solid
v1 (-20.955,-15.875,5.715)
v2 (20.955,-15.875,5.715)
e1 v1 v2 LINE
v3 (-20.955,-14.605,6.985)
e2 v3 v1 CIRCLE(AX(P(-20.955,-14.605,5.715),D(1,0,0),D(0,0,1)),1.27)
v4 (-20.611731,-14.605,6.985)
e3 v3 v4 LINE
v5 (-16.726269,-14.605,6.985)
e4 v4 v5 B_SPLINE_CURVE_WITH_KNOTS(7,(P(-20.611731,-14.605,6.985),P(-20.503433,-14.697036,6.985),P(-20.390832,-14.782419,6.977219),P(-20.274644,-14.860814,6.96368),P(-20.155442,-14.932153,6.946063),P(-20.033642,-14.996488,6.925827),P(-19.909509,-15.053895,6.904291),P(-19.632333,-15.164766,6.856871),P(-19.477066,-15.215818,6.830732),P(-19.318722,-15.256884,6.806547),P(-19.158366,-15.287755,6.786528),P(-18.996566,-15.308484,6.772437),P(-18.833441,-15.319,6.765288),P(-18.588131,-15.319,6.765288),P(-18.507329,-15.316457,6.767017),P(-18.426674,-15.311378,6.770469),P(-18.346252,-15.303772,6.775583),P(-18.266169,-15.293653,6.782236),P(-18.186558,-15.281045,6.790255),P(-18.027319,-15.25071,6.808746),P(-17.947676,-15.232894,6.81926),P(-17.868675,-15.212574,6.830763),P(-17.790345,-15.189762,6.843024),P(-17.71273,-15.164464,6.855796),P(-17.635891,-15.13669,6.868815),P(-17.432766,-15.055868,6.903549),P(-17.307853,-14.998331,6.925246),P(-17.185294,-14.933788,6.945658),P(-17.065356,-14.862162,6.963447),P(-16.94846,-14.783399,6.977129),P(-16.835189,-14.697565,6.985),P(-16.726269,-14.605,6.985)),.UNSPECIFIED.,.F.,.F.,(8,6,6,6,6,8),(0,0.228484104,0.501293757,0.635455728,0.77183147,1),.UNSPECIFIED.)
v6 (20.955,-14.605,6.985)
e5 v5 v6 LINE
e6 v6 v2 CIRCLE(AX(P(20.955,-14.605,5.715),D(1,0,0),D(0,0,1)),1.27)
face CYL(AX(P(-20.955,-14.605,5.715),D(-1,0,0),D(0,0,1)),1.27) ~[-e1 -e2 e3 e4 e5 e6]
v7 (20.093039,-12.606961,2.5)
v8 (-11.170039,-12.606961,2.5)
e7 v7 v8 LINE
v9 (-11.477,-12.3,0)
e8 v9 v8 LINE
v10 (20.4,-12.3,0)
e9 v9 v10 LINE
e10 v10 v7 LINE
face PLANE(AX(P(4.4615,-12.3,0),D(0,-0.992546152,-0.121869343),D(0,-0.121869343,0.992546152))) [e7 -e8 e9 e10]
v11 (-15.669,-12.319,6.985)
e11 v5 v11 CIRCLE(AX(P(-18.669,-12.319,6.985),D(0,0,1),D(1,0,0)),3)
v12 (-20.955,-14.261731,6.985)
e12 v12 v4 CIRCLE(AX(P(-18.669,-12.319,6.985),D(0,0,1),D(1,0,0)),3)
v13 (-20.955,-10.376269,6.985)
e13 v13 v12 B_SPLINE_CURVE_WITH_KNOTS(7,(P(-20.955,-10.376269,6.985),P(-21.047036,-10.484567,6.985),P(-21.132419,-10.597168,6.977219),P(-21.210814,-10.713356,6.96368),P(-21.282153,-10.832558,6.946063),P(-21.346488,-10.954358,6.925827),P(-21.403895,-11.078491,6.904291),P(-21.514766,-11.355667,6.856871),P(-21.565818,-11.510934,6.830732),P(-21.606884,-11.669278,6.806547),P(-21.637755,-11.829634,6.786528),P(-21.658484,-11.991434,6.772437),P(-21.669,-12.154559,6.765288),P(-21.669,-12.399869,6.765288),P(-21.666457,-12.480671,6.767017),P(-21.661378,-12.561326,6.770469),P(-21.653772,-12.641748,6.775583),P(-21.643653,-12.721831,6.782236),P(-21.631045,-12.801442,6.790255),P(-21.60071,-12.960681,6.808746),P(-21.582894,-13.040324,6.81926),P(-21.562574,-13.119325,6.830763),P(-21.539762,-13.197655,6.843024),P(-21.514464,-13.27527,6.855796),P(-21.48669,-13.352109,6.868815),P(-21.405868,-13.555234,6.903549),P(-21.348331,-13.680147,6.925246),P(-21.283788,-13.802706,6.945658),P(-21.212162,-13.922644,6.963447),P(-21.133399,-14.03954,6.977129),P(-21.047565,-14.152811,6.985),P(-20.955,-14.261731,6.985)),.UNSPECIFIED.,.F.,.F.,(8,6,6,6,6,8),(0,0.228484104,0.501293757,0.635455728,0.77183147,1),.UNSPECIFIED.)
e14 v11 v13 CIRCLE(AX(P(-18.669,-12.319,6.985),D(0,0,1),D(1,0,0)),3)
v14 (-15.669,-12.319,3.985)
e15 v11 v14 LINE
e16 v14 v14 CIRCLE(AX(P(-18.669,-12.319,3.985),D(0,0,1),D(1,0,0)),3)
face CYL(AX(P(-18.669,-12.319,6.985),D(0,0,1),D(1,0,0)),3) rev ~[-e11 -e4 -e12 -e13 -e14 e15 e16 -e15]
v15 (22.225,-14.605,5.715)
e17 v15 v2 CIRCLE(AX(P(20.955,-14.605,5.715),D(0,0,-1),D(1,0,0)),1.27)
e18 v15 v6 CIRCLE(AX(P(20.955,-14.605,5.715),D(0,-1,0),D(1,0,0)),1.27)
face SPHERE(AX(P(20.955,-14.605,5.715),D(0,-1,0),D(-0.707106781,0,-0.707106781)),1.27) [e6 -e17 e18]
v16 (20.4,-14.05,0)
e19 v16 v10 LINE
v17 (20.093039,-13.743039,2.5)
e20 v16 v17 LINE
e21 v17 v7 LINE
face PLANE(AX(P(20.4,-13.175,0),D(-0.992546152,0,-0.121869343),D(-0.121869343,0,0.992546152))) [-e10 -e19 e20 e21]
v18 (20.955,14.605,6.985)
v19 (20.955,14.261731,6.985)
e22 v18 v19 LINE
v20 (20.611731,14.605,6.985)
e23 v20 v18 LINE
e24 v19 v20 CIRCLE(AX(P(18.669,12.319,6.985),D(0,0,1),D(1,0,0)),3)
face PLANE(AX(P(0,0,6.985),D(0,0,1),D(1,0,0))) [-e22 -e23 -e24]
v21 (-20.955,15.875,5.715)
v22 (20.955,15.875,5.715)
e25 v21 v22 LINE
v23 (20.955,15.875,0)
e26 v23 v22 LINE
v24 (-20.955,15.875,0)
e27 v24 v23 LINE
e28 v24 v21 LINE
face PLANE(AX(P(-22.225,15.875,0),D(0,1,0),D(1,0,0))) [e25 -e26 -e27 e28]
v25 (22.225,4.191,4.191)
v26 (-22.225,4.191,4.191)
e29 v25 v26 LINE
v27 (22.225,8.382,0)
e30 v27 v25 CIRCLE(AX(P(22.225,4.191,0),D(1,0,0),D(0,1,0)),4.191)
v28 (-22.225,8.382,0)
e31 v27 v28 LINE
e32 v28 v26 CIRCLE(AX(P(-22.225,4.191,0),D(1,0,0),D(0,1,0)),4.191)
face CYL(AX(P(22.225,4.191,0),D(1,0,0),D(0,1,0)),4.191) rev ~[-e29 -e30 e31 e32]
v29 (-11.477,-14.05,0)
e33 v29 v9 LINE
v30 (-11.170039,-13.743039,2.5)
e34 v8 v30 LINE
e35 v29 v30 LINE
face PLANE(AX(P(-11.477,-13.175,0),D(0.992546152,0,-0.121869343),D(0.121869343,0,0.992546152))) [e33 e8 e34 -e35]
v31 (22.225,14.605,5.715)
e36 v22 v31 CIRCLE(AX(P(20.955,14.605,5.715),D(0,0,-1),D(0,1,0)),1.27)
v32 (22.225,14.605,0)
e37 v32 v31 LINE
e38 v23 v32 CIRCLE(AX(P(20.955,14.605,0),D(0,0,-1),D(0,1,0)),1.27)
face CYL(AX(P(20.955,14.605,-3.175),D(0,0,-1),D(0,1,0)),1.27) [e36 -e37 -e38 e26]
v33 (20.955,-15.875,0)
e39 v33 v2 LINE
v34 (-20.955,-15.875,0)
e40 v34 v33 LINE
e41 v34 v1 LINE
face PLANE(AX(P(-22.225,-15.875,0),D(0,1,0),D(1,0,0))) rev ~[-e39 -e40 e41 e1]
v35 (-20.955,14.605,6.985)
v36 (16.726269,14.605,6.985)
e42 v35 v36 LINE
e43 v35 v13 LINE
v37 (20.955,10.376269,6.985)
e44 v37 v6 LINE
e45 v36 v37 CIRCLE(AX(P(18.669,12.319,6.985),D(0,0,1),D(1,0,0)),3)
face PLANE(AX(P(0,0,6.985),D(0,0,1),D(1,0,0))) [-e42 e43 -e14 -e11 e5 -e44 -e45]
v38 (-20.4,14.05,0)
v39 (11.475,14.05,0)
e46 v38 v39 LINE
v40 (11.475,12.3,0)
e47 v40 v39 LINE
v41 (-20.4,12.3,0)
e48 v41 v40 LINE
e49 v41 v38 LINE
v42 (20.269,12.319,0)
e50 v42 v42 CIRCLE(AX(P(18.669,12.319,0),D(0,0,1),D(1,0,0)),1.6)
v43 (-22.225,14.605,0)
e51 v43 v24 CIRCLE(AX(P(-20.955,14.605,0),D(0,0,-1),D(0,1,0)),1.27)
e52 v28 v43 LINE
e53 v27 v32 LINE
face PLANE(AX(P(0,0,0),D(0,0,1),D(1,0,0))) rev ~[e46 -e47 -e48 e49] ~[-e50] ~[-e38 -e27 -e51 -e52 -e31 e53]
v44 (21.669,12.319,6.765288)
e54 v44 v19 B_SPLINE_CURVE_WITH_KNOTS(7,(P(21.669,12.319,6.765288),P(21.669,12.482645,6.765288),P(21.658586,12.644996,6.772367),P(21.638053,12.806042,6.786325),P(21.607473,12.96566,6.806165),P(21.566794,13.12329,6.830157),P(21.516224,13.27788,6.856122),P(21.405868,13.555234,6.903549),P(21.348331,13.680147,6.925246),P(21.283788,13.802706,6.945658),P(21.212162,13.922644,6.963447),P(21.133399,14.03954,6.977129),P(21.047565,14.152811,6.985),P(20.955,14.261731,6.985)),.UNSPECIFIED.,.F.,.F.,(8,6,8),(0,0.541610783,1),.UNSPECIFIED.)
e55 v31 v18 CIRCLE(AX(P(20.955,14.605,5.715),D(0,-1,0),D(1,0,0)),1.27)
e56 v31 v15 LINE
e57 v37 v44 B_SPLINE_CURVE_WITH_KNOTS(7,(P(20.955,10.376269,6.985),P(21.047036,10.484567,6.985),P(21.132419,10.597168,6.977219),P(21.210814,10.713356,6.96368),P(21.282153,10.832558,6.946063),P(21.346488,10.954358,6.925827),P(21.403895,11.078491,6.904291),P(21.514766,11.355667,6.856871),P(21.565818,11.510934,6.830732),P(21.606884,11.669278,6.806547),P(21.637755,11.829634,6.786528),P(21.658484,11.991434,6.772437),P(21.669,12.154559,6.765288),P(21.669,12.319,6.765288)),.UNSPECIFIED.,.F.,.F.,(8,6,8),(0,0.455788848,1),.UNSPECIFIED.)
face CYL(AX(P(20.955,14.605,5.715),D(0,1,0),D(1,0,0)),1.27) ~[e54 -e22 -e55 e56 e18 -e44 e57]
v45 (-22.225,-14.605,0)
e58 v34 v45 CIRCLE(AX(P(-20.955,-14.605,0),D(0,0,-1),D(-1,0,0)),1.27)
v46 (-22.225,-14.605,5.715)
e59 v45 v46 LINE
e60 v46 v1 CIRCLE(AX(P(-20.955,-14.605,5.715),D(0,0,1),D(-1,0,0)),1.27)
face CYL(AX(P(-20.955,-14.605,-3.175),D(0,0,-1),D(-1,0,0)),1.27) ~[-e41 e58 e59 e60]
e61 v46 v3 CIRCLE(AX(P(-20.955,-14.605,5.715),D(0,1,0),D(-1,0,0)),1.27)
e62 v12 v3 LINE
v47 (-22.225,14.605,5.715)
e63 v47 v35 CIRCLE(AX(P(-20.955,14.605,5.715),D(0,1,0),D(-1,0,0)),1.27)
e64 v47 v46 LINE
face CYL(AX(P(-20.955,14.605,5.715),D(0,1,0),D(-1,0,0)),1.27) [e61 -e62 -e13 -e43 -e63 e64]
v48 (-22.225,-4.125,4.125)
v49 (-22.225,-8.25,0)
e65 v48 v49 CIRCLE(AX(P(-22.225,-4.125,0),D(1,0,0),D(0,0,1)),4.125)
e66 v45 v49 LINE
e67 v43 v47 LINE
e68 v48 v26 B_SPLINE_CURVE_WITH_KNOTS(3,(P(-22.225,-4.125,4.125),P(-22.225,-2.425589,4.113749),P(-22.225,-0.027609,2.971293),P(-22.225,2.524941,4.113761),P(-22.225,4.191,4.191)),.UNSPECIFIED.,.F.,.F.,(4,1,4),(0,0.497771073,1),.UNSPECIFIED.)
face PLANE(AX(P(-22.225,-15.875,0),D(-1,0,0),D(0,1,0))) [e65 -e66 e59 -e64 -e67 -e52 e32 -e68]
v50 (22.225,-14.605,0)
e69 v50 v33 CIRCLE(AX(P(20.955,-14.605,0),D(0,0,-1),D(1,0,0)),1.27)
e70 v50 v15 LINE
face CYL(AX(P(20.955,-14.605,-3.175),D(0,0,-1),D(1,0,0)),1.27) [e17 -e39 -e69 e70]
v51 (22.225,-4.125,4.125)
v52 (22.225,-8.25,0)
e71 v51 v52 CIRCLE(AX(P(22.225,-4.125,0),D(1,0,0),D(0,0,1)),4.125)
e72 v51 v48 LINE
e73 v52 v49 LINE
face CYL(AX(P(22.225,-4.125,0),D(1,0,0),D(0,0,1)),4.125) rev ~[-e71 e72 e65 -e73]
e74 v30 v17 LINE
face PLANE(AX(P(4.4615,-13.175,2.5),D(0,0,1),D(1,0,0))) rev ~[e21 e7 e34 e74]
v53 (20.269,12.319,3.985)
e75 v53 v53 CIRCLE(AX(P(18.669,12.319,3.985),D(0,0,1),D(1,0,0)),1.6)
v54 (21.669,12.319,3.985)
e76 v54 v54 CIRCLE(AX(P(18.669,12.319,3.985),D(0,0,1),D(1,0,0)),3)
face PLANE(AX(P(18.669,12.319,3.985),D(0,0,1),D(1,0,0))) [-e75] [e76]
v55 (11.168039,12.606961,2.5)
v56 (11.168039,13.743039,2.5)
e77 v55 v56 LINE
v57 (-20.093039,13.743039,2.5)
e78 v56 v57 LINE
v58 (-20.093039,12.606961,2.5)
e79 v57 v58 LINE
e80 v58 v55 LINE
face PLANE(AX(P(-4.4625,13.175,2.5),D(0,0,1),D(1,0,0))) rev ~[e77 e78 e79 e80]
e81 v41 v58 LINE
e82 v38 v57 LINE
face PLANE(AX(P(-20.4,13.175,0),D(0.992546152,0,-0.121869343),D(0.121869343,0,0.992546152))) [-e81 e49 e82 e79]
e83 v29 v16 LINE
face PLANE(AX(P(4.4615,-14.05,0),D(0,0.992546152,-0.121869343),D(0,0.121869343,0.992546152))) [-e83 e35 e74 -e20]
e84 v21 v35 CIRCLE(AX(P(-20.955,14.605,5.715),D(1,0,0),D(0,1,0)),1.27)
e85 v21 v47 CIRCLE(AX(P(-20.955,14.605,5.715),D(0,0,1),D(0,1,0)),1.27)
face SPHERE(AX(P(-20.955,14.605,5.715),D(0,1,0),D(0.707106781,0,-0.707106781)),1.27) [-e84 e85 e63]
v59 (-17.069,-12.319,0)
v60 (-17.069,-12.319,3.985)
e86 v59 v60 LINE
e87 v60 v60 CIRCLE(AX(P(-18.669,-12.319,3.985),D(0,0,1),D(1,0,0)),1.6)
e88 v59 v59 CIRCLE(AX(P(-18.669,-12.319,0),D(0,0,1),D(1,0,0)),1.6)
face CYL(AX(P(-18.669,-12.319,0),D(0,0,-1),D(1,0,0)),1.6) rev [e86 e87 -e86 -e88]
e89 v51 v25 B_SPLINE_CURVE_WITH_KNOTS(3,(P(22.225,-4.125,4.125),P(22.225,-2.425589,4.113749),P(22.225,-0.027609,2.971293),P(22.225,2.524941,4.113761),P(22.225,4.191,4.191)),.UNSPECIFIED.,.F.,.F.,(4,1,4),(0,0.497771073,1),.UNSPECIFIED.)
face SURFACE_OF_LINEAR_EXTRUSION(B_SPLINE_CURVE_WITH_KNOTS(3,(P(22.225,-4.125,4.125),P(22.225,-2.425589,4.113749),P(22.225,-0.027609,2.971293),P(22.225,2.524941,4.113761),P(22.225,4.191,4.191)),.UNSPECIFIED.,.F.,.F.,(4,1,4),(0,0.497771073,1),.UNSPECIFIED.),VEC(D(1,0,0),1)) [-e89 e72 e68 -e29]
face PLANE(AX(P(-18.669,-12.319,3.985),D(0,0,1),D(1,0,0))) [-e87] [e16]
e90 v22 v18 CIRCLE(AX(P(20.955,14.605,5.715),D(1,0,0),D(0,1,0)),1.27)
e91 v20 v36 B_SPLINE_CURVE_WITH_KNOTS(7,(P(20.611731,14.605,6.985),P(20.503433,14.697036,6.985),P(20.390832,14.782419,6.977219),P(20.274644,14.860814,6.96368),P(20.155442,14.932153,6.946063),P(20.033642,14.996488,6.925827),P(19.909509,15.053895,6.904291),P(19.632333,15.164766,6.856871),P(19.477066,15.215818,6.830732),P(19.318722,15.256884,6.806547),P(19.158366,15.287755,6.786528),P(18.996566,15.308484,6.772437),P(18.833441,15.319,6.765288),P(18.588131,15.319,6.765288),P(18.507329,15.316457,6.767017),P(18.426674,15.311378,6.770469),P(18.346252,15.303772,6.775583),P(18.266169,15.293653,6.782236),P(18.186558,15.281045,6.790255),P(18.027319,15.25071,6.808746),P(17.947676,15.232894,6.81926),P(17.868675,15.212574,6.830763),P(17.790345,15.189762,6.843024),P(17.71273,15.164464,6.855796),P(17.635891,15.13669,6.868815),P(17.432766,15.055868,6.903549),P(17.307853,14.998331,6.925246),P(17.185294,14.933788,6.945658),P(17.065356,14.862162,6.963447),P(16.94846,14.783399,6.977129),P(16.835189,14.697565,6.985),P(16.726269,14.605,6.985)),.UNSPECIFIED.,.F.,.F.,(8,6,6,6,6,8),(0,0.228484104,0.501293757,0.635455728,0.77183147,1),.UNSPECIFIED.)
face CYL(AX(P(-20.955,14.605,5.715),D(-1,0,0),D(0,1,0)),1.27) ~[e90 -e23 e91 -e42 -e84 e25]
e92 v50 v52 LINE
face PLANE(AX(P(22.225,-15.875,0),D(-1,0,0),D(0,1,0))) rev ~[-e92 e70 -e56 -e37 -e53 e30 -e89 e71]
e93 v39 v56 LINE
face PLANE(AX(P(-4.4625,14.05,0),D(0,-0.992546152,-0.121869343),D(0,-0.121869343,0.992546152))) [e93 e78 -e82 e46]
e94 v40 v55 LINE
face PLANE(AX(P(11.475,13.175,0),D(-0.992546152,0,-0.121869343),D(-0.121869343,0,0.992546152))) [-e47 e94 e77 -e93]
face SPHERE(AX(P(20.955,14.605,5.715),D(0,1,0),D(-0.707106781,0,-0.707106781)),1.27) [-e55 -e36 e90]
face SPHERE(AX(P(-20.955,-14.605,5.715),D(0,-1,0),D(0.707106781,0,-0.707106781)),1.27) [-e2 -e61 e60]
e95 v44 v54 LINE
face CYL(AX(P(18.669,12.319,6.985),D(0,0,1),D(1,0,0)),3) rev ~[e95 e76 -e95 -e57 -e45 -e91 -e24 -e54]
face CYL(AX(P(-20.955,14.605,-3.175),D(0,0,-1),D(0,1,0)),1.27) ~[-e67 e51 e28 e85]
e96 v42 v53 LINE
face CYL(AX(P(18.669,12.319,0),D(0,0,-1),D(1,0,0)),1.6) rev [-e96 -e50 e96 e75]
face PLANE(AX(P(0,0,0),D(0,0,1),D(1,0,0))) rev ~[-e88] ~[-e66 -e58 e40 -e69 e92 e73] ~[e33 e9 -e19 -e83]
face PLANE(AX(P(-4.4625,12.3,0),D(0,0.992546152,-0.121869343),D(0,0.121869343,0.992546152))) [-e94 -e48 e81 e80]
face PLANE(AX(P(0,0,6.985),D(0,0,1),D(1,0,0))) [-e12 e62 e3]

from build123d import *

# Parameters (mm, degrees)
F1_W          = 44.45
F1_H          = 31.75
F2_DEPTH      = 6.985
F4_DEPTH      = 44.45
F6_W          = 31.875
F6_H          = 1.75
F6_W_2        = 31.877
F7_DEPTH      = 2.5
F7_TAPER      = 7
F5_R          = 1.6
F8_DEPTH      = 25.4
F9_R          = 3
F9_R_2        = 1.6
F10_DEPTH     = 3
F11_T1_DEPTH  = 29.21
F11_T3_DEPTH  = 8.89
F11_T5_DEPTH  = 41.91
F11_S9_W      = 1.27
F11_S9_H      = 1.27
F11_T10_DEPTH = 1.27
F11_S15_W     = 1.27
F11_S15_H     = 1.27
F11_T16_DEPTH = 1.27
F11_S21_W     = 1.27
F11_S21_H     = 1.27
F11_T22_DEPTH = 1.27
F11_S27_W     = 1.27
F11_S27_H     = 1.27
F11_T28_DEPTH = 1.27


# Not quite as in the source:
# - a fillet or chamfer that OpenCascade refuses, or shapes differently, is made with other operations: its cross-section is extruded or revolved along the edge and cut away or added


with BuildPart() as f2:
    # F1 (on Top) → F2 (new body)
    with BuildSketch(Plane.XY):
        Rectangle(F1_W, F1_H)
    extrude(amount=F2_DEPTH)

    # F3 (on face) → F4 (cut, through all)
    with BuildSketch(Plane.YZ.offset(22.225)):
        with BuildLine():
            add(Edge.make_bspline(
                [(-4.125, 4.125), (-2.4255892558, 4.1137489608), (-0.0276085061, 2.971292738), (2.5249406681, 4.1137612248), (4.191, 4.191)],
                knots=[0, 0, 0, 0, 0.4977710734, 1, 1, 1, 1], degree=3))
            ThreePointArc((-4.125, 4.125), (-7.0418154724, 2.9168154724), (-8.25, 0))
            ThreePointArc((-8.25, 0), (-7.0418154724, -2.9168154724), (-4.125, -4.125))
            add(Edge.make_bspline(
                [(-4.125, -4.125), (-2.9335741419, -4.2006121948), (0.4172014685, -3.0581585459), (2.1438994445, -4.2006121948), (4.191, -4.191)],
                knots=[0, 0, 0, 0, 0.497799261, 1, 1, 1, 1], degree=3))
            ThreePointArc((4.191, -4.191), (7.15448452, -2.96348452), (8.382, 0))
            ThreePointArc((8.382, 0), (7.15448452, 2.96348452), (4.191, 4.191))
        make_face()
    extrude(amount=-F4_DEPTH, mode=Mode.SUBTRACT)

    # F6 (on Top) → F7 (cut)
    with BuildSketch(Plane.XY):
        with Locations((-4.4625, 13.175)):
            Rectangle(F6_W, F6_H)
        with Locations((4.4615, -13.175)):
            Rectangle(F6_W_2, F6_H)
    extrude(amount=F7_DEPTH, taper=F7_TAPER, mode=Mode.SUBTRACT)

    # F5 (on Top) → F8 (cut)
    with BuildSketch(Plane.XY):
        with Locations((-18.669, -12.319)):
            Circle(F5_R)
        with Locations((18.669, 12.319)):
            Circle(F5_R)
    extrude(amount=F8_DEPTH, mode=Mode.SUBTRACT)

    # F9 (on face) → F10 (cut)
    with BuildSketch(Plane.XY.offset(6.985)):
        with Locations((-18.669, -12.319)):
            Circle(F9_R)
        with Locations((-18.669, -12.319)):
            Circle(F9_R_2, mode=Mode.SUBTRACT)
        with Locations((18.669, 12.319)):
            Circle(F9_R)
        with Locations((18.669, 12.319)):
            Circle(F9_R_2, mode=Mode.SUBTRACT)
    extrude(amount=-F10_DEPTH, mode=Mode.SUBTRACT)

    # F11: fillet of radius 1.27 on 8 edges, made by hand

    # F11_s2 → F11_t1 (cut)
    with BuildSketch(Plane.XZ.offset(-14.605)):
        with BuildLine():
            ThreePointArc((-22.225, 5.715), (-21.8530256121, 6.6130256121), (-20.955, 6.985))
            Line((-20.955, 6.985), (-22.225, 6.985))
            Line((-22.225, 6.985), (-22.225, 5.715))
        make_face()
        with BuildLine():
            ThreePointArc((22.225, 5.715), (21.8530256121, 6.6130256121), (20.955, 6.985))
            Line((20.955, 6.985), (22.225, 6.985))
            Line((22.225, 6.985), (22.225, 5.715))
        make_face()
    extrude(amount=F11_T1_DEPTH, mode=Mode.SUBTRACT)

    # F11_s4 → F11_t3 (cut)
    with BuildSketch(Plane.XY.offset(-3.175)):
        with BuildLine():
            ThreePointArc((-22.225, -14.605), (-21.8530256121, -15.5030256121), (-20.955, -15.875))
            Line((-20.955, -15.875), (-22.225, -15.875))
            Line((-22.225, -15.875), (-22.225, -14.605))
        make_face()
        with BuildLine():
            ThreePointArc((22.225, -14.605), (21.8530256121, -15.5030256121), (20.955, -15.875))
            Line((20.955, -15.875), (22.225, -15.875))
            Line((22.225, -15.875), (22.225, -14.605))
        make_face()
        with BuildLine():
            ThreePointArc((20.955, 15.875), (21.8530256121, 15.5030256121), (22.225, 14.605))
            Line((22.225, 14.605), (22.225, 15.875))
            Line((22.225, 15.875), (20.955, 15.875))
        make_face()
        with BuildLine():
            ThreePointArc((-20.955, 15.875), (-21.8530256121, 15.5030256121), (-22.225, 14.605))
            Line((-22.225, 14.605), (-22.225, 15.875))
            Line((-22.225, 15.875), (-20.955, 15.875))
        make_face()
    extrude(amount=F11_T3_DEPTH, mode=Mode.SUBTRACT)

    # F11_s6 → F11_t5 (cut)
    with BuildSketch(Plane.YZ.offset(-20.955)):
        with BuildLine():
            ThreePointArc((-14.605, 6.985), (-15.5030256121, 6.6130256121), (-15.875, 5.715))
            Line((-15.875, 5.715), (-15.875, 6.985))
            Line((-15.875, 6.985), (-14.605, 6.985))
        make_face()
        with BuildLine():
            ThreePointArc((15.875, 5.715), (15.5030256121, 6.6130256121), (14.605, 6.985))
            Line((14.605, 6.985), (15.875, 6.985))
            Line((15.875, 6.985), (15.875, 5.715))
        make_face()
    extrude(amount=F11_T5_DEPTH, mode=Mode.SUBTRACT)


with BuildPart() as f11_tool8:
    # F11_s9 → F11_t10 (new body)
    with BuildSketch(Plane.XZ.offset(-14.605)):
        with Locations((-21.59, 6.35)):
            Rectangle(F11_S9_W, F11_S9_H)
    extrude(amount=-F11_T10_DEPTH)

    # F11_s11 → F11_t12 (revolve, cut)
    with BuildSketch(Plane(origin=(-20.955, 14.605, 5.715), x_dir=(0.7071067812, 0, -0.7071067812), z_dir=(0.7071067812, 0, 0.7071067812))):
        with BuildLine():
            ThreePointArc((0, -1.27), (1.27, 0), (0, 1.27))
            Line((0, 1.27), (0, -1.27))
        make_face()
    revolve(axis=Axis((-20.955, 14.605, 5.715), (0, 1, 0)), mode=Mode.SUBTRACT)


with BuildPart() as f2_1:
    add(f2.part)

    # F11_t7: cut F11_tool8
    add(f11_tool8.part, mode=Mode.SUBTRACT)


with BuildPart() as f11_tool14:
    # F11_s15 → F11_t16 (new body)
    with BuildSketch(Plane.XZ.offset(14.605)):
        with Locations((-21.59, 6.35)):
            Rectangle(F11_S15_W, F11_S15_H)
    extrude(amount=F11_T16_DEPTH)

    # F11_s17 → F11_t18 (revolve, cut)
    with BuildSketch(Plane(origin=(-20.955, -14.605, 5.715), x_dir=(0.7071067812, 0, -0.7071067812), z_dir=(-0.7071067812, 0, -0.7071067812))):
        with BuildLine():
            ThreePointArc((0, -1.27), (1.27, 0), (0, 1.27))
            Line((0, 1.27), (0, -1.27))
        make_face()
    revolve(axis=Axis((-20.955, -14.605, 5.715), (0, -1, 0)), mode=Mode.SUBTRACT)


with BuildPart() as f2_2:
    add(f2_1.part)

    # F11_t13: cut F11_tool14
    add(f11_tool14.part, mode=Mode.SUBTRACT)


with BuildPart() as f11_tool20:
    # F11_s21 → F11_t22 (new body)
    with BuildSketch(Plane.XZ.offset(14.605)):
        with Locations((21.59, 6.35)):
            Rectangle(F11_S21_W, F11_S21_H)
    extrude(amount=F11_T22_DEPTH)

    # F11_s23 → F11_t24 (revolve, cut)
    with BuildSketch(Plane(origin=(20.955, -14.605, 5.715), x_dir=(-0.7071067812, 0, -0.7071067812), z_dir=(-0.7071067812, 0, 0.7071067812))):
        with BuildLine():
            ThreePointArc((0, -1.27), (1.27, 0), (0, 1.27))
            Line((0, 1.27), (0, -1.27))
        make_face()
    revolve(axis=Axis((20.955, -14.605, 5.715), (0, -1, 0)), mode=Mode.SUBTRACT)


with BuildPart() as f2_3:
    add(f2_2.part)

    # F11_t19: cut F11_tool20
    add(f11_tool20.part, mode=Mode.SUBTRACT)


with BuildPart() as f11_tool26:
    # F11_s27 → F11_t28 (new body)
    with BuildSketch(Plane.XZ.offset(-14.605)):
        with Locations((21.59, 6.35)):
            Rectangle(F11_S27_W, F11_S27_H)
    extrude(amount=-F11_T28_DEPTH)

    # F11_s29 → F11_t30 (revolve, cut)
    with BuildSketch(Plane(origin=(20.955, 14.605, 5.715), x_dir=(-0.7071067812, 0, -0.7071067812), z_dir=(0.7071067812, 0, -0.7071067812))):
        with BuildLine():
            ThreePointArc((0, -1.27), (1.27, 0), (0, 1.27))
            Line((0, 1.27), (0, -1.27))
        make_face()
    revolve(axis=Axis((20.955, 14.605, 5.715), (0, 1, 0)), mode=Mode.SUBTRACT)


with BuildPart() as f2_4:
    add(f2_3.part)

    # F11_t25: cut F11_tool26
    add(f11_tool26.part, mode=Mode.SUBTRACT)


solid = f2_4.part
